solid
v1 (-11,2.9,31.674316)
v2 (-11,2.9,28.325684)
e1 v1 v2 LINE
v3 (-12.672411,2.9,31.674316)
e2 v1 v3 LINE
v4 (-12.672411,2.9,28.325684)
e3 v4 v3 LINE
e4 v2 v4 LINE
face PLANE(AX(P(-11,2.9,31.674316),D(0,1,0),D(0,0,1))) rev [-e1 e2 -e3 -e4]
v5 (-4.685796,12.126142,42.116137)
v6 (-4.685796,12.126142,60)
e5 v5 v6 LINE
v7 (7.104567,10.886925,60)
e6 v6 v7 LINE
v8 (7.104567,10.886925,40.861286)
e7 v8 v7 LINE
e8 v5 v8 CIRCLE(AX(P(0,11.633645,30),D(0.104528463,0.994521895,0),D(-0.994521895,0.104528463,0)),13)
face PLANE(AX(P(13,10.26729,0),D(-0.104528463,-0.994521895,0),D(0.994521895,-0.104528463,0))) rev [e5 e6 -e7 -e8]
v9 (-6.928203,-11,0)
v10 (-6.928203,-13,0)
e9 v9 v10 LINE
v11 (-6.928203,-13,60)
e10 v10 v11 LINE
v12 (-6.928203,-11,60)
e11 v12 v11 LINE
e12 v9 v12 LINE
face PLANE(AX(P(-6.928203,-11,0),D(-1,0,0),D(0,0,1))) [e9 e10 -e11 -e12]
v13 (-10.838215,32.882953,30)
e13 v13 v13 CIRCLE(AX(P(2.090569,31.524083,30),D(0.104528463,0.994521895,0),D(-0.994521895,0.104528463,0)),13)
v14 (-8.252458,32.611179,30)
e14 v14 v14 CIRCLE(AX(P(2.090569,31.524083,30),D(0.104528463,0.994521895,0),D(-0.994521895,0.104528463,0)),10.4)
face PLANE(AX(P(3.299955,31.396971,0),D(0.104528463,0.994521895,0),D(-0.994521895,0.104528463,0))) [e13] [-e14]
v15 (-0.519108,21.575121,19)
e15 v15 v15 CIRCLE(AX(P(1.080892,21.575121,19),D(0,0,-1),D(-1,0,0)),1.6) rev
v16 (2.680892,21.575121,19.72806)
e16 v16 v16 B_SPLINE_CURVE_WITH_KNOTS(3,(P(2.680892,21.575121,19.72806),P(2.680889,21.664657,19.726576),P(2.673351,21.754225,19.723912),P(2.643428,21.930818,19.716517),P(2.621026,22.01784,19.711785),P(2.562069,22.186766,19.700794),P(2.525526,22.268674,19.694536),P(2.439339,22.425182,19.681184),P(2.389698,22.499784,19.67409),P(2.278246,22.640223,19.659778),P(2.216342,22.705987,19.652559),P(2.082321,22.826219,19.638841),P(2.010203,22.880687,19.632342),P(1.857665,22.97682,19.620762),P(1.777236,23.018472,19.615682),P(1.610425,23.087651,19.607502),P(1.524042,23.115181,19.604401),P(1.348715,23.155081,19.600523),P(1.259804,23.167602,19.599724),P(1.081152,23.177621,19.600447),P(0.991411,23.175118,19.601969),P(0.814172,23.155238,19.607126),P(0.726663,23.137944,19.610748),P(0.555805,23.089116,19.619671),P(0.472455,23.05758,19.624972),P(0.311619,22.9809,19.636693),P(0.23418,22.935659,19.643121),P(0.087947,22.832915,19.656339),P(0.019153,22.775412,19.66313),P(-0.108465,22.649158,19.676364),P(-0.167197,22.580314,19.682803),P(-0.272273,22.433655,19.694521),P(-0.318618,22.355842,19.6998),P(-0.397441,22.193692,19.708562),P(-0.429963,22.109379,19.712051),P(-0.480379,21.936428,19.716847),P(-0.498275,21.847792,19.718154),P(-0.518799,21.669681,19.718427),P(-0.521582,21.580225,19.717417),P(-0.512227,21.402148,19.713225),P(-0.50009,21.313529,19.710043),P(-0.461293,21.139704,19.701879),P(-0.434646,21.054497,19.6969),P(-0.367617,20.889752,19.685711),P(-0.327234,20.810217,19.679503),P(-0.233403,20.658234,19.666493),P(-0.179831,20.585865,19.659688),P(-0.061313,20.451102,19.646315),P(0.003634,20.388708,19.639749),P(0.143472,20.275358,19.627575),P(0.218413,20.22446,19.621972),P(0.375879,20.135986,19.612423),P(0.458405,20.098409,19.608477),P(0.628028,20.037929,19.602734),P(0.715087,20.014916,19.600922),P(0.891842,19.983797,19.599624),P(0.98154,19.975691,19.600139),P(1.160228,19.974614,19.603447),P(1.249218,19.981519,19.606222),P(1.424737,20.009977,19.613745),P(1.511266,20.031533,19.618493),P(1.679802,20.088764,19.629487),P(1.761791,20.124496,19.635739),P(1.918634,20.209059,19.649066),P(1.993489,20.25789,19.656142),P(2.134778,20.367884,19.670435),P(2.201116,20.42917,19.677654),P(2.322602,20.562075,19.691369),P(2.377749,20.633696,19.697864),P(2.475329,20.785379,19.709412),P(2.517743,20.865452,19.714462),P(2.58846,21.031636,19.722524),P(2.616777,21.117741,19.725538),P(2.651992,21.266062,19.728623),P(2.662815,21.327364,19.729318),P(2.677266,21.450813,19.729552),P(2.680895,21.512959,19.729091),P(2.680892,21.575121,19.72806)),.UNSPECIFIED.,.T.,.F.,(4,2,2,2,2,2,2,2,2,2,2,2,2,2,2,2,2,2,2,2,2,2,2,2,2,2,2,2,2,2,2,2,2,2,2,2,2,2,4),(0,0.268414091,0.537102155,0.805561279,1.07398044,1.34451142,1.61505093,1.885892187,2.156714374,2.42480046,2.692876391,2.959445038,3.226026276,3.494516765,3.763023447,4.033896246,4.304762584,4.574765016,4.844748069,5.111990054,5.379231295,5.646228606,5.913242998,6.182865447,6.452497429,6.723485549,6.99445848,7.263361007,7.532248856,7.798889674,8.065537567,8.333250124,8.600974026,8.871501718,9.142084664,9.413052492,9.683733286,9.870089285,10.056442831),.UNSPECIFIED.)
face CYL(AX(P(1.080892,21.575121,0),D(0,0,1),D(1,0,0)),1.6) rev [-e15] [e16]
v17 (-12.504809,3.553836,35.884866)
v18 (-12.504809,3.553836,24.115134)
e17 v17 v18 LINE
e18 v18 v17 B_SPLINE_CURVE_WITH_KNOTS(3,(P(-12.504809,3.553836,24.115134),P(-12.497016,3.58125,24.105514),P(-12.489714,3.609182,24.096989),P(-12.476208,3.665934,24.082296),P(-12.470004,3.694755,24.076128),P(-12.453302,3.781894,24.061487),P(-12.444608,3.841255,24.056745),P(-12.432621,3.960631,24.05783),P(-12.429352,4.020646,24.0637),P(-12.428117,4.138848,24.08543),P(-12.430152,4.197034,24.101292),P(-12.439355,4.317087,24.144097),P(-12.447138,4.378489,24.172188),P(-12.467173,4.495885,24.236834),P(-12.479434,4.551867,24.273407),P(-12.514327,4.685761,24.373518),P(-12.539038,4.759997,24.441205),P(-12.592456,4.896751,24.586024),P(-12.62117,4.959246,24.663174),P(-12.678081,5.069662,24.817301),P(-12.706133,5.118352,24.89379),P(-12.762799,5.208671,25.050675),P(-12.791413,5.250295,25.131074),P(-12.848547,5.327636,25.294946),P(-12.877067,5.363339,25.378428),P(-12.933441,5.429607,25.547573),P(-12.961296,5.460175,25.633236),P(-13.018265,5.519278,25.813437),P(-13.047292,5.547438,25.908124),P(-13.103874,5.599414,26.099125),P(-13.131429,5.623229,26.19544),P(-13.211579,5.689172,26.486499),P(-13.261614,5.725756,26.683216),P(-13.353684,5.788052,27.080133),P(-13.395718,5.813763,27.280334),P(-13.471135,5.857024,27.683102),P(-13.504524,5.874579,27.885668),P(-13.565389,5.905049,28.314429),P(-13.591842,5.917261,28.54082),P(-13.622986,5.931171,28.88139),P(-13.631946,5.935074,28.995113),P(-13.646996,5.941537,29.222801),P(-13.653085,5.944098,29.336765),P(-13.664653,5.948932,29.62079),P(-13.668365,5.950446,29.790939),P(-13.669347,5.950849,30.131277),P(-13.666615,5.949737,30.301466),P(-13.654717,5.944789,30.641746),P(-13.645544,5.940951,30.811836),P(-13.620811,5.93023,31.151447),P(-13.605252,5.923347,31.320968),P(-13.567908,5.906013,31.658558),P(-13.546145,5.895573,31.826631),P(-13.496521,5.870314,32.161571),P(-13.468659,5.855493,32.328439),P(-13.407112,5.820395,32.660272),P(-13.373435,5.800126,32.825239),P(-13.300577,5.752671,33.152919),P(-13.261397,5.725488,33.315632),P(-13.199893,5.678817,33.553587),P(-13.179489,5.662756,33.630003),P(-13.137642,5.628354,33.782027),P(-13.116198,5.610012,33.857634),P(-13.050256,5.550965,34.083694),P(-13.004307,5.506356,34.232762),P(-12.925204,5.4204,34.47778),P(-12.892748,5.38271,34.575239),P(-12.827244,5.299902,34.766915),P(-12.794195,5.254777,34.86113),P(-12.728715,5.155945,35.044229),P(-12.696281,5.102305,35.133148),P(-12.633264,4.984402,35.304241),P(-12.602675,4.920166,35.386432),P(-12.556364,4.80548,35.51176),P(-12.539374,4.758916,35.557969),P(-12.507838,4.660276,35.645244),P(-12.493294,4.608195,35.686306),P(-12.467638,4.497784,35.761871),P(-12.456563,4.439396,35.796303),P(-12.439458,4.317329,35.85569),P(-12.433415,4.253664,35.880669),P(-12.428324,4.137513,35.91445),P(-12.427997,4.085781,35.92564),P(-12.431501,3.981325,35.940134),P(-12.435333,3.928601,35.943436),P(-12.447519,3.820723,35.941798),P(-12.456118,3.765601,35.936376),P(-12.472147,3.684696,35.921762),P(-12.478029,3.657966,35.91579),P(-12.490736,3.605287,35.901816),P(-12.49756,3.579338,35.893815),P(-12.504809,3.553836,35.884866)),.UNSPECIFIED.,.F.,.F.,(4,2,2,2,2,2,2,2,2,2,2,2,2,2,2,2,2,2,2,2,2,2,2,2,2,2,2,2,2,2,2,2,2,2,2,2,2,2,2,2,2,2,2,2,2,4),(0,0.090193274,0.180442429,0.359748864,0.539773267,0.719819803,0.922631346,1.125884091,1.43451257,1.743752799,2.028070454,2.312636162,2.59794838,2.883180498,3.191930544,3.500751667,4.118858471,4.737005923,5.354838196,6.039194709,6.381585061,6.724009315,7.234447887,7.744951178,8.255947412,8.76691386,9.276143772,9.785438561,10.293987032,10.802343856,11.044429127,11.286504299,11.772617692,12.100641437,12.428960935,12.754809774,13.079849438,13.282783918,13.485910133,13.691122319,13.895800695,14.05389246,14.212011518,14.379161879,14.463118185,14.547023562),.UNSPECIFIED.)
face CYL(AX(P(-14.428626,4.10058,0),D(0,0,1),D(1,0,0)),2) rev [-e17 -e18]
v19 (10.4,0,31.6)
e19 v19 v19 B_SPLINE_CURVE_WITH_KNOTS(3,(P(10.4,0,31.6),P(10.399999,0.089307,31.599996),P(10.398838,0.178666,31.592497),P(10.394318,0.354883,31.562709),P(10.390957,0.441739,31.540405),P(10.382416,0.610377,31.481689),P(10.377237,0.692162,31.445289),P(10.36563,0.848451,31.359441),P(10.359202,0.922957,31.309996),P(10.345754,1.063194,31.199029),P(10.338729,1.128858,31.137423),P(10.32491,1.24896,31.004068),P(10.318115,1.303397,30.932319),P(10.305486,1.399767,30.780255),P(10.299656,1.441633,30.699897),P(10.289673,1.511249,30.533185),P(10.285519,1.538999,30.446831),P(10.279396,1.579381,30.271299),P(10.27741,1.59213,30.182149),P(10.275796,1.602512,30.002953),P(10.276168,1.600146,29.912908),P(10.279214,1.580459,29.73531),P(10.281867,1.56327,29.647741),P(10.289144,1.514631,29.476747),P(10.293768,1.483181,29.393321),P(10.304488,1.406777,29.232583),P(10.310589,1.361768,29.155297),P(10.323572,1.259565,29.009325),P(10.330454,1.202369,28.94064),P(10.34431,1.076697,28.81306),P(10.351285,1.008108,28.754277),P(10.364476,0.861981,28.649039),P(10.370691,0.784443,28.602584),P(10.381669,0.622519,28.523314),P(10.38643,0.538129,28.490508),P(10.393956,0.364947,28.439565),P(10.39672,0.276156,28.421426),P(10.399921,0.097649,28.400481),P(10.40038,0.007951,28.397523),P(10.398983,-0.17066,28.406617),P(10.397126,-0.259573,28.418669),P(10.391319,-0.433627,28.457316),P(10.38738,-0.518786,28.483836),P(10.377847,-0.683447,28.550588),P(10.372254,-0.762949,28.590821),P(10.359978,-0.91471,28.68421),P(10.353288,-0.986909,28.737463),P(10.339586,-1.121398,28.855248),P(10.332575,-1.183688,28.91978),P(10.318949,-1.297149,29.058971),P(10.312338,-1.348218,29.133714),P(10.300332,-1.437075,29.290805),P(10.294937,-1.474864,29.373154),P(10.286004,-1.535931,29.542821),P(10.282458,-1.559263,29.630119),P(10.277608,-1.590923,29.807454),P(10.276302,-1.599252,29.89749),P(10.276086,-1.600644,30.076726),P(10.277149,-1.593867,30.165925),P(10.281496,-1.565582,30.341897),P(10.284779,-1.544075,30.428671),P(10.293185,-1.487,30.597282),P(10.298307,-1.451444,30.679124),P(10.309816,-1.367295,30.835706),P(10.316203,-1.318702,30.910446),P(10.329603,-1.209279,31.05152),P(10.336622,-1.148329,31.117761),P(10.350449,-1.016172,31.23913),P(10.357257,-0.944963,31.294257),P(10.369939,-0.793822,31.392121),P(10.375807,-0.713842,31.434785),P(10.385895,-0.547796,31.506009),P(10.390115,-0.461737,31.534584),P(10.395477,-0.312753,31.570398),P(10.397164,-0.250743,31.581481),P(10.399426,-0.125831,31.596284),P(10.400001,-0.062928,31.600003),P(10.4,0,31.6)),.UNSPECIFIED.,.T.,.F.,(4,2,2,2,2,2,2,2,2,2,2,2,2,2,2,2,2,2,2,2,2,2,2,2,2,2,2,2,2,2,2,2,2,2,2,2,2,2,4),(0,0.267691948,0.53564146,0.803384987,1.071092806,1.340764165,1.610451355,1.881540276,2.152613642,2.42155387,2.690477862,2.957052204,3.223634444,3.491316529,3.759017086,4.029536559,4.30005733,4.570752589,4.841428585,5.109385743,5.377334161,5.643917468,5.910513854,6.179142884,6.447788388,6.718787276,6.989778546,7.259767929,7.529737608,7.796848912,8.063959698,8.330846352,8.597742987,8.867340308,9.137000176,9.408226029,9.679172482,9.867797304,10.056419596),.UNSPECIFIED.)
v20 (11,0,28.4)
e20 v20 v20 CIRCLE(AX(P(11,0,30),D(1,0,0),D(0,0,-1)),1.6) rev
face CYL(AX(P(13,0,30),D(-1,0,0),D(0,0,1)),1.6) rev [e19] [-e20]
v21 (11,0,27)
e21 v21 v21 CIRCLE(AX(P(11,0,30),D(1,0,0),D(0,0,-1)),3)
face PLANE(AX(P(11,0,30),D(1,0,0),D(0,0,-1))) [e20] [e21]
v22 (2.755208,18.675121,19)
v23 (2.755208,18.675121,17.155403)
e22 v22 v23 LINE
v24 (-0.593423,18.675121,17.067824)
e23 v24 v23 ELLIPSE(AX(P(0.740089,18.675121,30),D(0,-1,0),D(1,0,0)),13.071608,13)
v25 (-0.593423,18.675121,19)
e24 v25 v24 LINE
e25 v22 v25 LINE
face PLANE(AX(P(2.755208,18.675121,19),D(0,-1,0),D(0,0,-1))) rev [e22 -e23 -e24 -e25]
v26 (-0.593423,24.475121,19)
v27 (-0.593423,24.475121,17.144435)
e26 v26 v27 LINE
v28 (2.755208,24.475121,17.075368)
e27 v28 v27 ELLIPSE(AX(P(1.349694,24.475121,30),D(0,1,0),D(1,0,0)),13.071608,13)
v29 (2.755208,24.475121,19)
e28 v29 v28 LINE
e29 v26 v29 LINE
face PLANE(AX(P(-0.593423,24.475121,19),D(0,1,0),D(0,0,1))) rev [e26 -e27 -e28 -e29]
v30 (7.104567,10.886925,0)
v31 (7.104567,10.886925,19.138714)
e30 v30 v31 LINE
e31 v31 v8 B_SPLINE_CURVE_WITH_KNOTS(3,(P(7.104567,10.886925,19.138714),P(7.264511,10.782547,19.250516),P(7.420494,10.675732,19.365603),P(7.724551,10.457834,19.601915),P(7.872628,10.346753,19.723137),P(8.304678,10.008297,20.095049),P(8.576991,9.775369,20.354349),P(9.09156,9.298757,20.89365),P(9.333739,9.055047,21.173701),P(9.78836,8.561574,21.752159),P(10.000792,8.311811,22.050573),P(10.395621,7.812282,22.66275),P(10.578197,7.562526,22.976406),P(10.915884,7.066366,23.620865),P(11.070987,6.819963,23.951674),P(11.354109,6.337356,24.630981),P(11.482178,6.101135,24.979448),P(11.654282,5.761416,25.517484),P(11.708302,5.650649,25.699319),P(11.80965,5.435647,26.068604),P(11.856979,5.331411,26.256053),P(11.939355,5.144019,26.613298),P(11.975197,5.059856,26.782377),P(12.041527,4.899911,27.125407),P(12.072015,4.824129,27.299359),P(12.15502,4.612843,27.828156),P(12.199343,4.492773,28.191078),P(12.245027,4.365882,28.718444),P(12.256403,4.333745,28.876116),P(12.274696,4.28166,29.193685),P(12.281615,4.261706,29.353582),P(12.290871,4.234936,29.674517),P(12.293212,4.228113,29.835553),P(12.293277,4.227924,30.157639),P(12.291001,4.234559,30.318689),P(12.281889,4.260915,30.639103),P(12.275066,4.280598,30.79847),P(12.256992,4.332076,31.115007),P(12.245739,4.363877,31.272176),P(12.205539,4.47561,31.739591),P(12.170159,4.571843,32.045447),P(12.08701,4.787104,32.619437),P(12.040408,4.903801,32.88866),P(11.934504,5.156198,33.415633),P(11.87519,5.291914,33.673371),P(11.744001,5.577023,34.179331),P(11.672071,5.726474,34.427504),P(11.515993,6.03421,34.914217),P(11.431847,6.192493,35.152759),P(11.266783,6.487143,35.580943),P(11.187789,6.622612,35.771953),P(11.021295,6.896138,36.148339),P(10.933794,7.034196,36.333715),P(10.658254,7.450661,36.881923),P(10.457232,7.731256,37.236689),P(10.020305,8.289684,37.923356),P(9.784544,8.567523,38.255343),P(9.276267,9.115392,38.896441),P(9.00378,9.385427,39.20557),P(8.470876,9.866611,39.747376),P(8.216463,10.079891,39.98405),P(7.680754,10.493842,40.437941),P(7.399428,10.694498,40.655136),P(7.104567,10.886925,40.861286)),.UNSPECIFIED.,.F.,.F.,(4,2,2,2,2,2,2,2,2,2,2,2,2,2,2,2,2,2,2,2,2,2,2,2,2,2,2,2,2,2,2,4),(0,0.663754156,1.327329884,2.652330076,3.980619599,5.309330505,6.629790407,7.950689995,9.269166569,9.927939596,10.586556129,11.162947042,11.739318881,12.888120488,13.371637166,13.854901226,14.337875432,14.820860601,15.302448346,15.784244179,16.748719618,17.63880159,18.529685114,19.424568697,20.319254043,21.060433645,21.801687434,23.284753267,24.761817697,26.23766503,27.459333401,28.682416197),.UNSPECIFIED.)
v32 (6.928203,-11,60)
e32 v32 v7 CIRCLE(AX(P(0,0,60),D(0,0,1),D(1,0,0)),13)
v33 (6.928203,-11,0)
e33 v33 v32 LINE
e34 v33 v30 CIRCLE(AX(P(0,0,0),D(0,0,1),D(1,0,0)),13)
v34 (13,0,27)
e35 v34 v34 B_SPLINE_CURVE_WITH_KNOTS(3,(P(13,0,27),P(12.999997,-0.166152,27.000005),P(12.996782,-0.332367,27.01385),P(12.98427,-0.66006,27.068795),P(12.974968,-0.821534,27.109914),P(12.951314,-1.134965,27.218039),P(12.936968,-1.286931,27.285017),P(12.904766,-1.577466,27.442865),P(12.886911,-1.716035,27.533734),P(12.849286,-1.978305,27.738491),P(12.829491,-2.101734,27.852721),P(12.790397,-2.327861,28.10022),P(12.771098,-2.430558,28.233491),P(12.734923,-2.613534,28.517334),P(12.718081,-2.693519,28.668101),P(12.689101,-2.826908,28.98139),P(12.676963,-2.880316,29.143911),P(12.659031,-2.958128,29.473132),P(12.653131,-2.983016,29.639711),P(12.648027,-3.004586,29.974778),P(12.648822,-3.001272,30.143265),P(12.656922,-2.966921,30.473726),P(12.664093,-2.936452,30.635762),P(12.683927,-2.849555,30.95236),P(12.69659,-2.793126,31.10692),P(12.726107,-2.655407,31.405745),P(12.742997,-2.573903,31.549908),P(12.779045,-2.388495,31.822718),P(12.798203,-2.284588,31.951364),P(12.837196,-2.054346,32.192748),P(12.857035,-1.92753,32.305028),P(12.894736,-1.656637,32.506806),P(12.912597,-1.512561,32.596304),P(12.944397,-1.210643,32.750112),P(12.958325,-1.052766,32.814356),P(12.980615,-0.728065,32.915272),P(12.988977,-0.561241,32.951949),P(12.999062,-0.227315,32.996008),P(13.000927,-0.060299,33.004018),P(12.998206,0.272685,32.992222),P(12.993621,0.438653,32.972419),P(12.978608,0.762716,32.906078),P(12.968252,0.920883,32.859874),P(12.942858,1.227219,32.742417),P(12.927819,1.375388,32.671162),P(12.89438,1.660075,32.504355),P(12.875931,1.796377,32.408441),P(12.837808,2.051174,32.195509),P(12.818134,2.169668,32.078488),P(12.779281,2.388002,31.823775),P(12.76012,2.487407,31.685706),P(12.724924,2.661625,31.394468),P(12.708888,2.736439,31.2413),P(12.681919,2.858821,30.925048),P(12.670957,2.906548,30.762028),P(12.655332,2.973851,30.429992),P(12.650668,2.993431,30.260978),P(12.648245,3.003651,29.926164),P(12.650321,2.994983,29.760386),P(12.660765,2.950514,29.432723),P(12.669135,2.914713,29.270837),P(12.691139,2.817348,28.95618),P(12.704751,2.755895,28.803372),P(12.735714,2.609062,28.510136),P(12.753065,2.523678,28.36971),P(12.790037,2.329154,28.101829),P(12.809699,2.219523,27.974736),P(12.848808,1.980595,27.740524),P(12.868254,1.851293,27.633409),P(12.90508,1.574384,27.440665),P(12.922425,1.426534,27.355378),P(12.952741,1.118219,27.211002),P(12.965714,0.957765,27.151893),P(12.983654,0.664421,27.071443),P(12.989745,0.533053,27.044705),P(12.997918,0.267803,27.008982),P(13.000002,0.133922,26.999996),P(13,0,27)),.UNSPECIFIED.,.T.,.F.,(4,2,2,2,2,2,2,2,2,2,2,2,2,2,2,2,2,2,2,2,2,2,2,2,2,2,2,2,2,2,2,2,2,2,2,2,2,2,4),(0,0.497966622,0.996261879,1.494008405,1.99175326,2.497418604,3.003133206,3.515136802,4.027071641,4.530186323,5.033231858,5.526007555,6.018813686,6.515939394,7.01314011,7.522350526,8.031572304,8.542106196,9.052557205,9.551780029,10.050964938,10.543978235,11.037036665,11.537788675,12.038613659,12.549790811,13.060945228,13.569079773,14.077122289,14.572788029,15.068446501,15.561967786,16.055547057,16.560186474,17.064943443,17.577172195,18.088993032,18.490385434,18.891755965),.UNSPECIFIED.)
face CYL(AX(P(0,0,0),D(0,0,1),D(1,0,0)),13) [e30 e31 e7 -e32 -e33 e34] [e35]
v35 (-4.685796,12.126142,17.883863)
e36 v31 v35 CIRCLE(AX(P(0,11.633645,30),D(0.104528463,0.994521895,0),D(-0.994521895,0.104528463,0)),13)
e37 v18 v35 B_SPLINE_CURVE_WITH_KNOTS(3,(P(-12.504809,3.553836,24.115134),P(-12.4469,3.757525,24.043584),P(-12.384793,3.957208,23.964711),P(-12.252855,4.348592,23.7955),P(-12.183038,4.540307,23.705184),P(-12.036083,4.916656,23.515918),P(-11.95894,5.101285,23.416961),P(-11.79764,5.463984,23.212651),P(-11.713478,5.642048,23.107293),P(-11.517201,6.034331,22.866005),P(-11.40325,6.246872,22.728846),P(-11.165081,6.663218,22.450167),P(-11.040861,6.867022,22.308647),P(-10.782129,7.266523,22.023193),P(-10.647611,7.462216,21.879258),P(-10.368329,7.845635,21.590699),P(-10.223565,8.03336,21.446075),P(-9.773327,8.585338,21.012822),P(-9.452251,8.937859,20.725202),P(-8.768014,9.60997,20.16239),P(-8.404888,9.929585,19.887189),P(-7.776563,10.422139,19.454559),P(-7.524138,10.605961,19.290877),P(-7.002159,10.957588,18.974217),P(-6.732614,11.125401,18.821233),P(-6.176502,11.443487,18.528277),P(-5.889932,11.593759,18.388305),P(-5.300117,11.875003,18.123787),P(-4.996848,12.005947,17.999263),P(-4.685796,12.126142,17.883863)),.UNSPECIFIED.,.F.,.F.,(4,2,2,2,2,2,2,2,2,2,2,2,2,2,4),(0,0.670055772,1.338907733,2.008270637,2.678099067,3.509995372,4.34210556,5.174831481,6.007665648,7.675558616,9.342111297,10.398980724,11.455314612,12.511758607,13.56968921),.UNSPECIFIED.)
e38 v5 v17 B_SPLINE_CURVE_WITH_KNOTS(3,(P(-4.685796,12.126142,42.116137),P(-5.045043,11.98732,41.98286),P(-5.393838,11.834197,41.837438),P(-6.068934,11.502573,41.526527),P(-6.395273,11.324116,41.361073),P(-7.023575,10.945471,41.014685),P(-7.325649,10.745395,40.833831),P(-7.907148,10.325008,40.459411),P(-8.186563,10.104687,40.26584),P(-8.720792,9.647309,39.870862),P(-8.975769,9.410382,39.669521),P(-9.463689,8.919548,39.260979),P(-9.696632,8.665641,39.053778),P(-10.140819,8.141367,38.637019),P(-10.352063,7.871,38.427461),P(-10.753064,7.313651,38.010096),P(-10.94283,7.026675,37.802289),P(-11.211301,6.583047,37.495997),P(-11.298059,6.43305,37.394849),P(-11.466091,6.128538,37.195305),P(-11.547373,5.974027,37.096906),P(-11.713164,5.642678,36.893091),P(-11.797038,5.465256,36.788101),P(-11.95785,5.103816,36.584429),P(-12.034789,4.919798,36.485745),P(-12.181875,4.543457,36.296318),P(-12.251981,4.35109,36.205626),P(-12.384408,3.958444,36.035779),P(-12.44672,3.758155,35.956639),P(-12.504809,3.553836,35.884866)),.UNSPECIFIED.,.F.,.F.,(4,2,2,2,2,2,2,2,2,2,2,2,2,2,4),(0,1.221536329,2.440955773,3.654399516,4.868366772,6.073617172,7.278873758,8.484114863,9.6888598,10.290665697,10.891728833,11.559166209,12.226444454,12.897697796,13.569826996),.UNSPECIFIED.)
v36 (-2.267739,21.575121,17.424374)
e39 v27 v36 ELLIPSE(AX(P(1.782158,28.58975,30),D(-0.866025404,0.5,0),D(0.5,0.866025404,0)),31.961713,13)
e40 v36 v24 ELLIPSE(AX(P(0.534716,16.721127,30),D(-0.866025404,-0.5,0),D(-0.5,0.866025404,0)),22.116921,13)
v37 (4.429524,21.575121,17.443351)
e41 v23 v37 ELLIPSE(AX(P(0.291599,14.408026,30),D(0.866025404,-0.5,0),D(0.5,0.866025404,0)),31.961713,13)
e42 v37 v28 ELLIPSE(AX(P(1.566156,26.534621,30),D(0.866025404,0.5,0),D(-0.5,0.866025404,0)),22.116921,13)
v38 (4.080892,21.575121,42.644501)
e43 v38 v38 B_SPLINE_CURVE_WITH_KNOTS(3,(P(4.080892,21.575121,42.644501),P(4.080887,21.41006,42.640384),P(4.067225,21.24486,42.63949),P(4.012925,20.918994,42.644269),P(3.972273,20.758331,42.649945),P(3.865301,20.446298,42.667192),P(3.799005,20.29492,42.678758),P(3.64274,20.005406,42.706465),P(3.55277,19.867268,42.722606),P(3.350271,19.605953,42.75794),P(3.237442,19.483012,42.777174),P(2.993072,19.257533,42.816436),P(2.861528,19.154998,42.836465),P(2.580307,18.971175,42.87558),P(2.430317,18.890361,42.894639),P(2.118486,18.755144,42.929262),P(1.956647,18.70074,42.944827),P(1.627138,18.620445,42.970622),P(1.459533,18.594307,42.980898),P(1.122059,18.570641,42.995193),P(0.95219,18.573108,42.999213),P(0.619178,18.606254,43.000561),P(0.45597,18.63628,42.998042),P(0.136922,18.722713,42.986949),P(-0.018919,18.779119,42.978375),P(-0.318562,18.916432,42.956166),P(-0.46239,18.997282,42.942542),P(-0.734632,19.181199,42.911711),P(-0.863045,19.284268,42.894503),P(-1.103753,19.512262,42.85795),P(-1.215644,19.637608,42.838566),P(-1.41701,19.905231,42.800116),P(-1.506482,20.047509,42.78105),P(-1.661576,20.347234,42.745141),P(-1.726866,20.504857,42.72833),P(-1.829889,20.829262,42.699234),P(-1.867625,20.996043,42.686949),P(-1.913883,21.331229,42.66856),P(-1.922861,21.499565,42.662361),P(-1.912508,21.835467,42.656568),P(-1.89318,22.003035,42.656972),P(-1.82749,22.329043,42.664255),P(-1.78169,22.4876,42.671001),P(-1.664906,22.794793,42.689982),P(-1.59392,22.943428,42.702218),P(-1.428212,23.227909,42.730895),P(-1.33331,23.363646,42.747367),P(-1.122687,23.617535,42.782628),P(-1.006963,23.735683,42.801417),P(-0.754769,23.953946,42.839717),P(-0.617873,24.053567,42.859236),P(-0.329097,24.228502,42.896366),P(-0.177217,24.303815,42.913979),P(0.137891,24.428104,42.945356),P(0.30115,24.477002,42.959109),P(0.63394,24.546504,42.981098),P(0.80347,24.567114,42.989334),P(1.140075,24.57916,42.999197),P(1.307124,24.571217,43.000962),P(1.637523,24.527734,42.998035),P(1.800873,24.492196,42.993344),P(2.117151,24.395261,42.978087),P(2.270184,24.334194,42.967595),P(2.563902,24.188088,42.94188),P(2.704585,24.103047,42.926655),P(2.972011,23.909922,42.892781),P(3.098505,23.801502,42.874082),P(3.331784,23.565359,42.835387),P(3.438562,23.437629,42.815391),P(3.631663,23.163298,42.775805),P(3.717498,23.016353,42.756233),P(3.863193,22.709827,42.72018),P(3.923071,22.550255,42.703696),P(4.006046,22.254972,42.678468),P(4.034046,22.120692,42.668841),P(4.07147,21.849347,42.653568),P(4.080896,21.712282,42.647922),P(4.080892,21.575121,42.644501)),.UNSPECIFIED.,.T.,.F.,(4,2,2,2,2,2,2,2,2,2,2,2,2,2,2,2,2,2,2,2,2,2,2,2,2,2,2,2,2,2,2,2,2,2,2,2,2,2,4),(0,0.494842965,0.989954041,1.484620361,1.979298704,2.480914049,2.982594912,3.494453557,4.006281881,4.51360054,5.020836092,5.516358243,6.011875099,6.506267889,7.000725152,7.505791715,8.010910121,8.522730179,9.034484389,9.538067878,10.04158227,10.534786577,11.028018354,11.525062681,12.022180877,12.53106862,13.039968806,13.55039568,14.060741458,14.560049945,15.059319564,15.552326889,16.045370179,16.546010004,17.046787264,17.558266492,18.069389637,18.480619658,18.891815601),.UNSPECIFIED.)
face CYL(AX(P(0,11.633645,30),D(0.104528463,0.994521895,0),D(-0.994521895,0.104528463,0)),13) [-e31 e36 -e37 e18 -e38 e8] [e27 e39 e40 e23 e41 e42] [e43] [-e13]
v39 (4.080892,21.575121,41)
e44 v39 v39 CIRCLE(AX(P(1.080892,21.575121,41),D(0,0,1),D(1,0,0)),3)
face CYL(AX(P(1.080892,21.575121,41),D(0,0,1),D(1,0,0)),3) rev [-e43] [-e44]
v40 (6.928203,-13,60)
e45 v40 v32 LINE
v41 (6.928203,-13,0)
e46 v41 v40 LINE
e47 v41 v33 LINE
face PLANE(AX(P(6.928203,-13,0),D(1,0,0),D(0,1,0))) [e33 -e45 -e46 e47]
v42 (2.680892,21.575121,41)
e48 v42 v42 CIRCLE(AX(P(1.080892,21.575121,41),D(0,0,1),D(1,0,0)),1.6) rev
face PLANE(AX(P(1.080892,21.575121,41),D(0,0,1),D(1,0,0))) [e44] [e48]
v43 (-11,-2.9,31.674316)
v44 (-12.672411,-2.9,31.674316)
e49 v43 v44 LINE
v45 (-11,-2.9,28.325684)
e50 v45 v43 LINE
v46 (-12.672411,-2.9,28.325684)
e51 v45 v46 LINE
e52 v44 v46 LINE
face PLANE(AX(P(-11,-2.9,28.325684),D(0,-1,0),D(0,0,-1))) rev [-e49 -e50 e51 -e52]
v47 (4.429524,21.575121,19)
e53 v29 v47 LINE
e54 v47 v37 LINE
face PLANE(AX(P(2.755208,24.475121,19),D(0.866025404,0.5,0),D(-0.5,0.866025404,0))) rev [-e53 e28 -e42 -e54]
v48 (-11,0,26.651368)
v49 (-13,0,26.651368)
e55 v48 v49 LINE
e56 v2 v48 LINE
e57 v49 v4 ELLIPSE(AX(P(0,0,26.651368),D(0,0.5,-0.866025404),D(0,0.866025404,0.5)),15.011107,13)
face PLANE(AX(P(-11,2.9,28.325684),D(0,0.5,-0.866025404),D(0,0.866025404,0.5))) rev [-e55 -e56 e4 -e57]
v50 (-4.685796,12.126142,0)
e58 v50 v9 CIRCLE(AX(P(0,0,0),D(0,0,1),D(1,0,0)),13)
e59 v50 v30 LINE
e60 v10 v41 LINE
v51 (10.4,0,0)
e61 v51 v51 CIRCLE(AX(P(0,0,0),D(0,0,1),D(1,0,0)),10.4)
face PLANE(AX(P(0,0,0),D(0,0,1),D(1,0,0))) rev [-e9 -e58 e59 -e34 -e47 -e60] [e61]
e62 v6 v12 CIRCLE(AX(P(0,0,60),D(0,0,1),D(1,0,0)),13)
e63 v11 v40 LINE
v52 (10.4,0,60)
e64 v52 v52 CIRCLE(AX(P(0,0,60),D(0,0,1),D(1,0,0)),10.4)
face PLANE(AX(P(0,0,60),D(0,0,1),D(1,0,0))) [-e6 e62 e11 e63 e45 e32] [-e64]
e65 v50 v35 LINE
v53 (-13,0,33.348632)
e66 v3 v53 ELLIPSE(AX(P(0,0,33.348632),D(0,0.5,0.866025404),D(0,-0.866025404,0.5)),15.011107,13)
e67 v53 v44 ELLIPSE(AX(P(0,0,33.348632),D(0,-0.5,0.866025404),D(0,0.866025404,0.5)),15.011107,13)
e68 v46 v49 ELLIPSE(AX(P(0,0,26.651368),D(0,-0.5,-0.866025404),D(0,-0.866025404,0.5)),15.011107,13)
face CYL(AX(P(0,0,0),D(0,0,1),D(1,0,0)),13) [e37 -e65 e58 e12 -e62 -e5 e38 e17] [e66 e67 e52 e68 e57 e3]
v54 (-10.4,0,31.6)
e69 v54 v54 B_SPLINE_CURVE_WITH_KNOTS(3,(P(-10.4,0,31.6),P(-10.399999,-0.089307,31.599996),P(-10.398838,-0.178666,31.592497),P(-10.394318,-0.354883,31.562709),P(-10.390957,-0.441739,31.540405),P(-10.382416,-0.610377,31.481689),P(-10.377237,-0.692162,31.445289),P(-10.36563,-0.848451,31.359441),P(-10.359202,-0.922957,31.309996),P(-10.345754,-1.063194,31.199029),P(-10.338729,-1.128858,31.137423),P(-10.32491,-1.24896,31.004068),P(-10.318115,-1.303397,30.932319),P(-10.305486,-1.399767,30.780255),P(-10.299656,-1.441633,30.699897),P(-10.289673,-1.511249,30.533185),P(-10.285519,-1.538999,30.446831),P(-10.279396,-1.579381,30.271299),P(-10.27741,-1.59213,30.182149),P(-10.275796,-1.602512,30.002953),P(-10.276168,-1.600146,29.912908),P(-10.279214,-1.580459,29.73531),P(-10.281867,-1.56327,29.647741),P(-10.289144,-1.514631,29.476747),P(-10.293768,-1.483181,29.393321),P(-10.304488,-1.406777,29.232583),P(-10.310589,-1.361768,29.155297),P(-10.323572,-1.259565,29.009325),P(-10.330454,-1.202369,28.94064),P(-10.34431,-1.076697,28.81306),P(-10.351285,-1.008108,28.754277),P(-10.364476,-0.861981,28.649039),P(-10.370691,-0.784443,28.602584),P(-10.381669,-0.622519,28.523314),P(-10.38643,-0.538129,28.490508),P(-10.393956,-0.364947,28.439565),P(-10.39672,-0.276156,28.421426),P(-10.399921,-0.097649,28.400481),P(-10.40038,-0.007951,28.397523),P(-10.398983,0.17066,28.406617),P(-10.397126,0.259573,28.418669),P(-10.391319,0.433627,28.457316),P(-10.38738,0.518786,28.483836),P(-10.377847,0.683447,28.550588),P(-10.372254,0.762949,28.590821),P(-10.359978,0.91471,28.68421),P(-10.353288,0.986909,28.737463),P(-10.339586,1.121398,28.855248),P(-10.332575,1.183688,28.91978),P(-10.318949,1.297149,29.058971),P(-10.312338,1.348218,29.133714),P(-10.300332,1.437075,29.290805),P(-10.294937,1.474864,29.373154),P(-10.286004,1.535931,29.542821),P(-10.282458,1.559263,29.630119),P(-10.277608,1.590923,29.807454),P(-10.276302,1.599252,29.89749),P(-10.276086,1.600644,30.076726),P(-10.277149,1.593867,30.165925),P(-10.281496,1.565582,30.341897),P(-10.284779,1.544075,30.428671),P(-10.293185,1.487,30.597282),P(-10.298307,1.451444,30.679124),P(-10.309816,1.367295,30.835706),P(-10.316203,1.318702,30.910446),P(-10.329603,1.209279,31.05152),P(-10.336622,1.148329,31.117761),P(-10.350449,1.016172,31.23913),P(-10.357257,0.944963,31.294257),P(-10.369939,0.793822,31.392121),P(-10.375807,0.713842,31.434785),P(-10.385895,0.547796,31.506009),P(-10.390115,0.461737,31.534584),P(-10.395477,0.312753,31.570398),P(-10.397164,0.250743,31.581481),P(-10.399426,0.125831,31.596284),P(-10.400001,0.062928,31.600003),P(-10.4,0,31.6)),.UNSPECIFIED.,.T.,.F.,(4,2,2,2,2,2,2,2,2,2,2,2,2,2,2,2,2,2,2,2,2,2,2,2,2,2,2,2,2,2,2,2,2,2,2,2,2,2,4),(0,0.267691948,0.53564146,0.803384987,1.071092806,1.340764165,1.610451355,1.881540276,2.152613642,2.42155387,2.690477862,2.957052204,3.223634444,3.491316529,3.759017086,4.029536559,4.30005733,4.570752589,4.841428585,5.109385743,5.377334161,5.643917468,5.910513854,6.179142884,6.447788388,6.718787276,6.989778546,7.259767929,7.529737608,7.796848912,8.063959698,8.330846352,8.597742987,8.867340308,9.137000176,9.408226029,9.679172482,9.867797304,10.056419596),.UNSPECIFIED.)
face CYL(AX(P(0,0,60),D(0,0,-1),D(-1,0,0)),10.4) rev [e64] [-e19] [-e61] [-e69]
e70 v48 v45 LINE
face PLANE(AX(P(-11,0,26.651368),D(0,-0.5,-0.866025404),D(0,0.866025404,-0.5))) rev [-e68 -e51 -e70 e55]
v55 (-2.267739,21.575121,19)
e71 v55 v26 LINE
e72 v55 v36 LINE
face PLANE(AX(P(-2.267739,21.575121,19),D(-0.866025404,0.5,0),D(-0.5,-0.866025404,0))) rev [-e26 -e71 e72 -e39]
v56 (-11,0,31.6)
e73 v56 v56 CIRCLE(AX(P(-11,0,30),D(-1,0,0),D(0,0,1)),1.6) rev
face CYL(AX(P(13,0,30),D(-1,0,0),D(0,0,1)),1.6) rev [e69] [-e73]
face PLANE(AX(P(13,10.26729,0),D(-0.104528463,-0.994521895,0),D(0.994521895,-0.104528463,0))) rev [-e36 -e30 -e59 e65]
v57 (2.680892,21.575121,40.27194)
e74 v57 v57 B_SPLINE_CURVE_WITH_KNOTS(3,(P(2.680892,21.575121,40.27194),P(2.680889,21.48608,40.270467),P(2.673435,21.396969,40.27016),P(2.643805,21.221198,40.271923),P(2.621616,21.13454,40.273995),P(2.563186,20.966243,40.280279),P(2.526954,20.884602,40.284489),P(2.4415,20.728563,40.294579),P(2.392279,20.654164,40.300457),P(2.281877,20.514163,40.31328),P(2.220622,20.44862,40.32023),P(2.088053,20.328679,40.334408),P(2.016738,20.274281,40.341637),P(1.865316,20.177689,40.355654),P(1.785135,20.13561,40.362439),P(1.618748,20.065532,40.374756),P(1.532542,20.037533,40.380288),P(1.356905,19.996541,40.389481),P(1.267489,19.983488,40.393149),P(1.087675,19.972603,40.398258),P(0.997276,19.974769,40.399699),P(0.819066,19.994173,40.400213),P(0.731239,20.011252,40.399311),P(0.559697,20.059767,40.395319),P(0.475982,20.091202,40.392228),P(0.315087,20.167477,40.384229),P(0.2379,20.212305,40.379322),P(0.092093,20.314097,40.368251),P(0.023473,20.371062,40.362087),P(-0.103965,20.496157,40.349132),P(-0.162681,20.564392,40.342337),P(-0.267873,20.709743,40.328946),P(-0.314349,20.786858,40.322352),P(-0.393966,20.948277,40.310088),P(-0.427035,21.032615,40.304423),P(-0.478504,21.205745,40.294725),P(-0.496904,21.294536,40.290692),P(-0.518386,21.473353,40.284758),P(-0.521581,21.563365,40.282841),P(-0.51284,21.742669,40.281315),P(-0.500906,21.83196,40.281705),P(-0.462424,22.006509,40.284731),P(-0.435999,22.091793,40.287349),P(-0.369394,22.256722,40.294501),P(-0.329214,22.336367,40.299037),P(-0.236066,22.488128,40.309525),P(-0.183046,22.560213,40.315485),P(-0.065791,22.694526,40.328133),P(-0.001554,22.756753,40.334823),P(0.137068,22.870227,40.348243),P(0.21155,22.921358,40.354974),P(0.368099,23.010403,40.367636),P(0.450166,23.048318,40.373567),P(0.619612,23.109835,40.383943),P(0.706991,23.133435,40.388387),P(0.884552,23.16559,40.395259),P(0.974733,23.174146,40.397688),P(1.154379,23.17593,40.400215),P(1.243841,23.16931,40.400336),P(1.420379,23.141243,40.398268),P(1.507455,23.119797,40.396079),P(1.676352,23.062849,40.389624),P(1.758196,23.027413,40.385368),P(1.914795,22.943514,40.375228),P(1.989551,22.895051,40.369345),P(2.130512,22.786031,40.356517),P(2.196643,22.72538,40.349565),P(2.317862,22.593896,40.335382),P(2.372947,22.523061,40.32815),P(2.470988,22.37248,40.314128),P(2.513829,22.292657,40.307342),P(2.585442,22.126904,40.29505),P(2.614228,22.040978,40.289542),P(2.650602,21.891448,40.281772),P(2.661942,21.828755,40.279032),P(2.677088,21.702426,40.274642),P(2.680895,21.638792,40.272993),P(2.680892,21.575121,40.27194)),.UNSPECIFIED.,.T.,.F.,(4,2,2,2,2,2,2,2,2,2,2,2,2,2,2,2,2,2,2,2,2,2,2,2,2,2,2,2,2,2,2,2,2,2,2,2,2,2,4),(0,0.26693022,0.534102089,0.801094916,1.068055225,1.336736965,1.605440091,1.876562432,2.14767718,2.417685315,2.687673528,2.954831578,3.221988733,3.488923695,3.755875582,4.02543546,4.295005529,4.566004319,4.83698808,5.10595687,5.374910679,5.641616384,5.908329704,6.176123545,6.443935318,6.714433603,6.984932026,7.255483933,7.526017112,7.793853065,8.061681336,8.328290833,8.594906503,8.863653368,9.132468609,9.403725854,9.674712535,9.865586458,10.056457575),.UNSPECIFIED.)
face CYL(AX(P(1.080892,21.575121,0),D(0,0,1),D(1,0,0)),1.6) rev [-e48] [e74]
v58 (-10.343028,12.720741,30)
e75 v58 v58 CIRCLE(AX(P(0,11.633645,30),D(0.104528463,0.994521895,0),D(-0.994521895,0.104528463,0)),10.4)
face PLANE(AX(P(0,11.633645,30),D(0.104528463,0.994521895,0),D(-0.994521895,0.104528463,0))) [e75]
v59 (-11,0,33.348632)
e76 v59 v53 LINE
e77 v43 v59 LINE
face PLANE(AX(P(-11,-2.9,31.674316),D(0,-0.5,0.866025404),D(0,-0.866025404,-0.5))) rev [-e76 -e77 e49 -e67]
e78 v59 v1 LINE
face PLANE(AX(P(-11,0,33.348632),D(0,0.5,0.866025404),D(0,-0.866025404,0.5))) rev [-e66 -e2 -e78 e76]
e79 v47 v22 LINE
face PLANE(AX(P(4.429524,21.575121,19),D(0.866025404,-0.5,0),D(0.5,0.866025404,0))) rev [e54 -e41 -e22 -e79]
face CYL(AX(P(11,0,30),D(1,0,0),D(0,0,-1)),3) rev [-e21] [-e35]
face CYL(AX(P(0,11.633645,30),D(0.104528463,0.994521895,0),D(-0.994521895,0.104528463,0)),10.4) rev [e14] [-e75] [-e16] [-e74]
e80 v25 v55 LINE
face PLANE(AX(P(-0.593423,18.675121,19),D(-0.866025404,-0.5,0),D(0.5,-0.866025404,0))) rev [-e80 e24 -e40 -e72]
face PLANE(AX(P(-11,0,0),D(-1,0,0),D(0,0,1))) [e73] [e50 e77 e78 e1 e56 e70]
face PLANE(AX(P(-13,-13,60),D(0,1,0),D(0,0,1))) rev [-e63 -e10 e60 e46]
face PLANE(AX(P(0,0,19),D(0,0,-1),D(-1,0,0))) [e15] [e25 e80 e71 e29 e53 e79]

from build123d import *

# Parameters (mm, degrees)
SKETCH1_W            = 26
SKETCH1_H            = 26
SKETCH1_R            = 10.4
BOSS_EXTRUDE2_DEPTH  = 60
SKETCH2_R            = 1.6
CUT_EXTRUDE1_DEPTH   = 67.670833203
CUT_EXTRUDE2_DEPTH   = 2
SKETCH4_R            = 3
CUT_EXTRUDE3_DEPTH   = 2
CUT_EXTRUDE5_DEPTH   = 63.753486055
SKETCH7_W            = 26
SKETCH7_H            = 26
BOSS_EXTRUDE3_DEPTH  = 20
SKETCH8_R            = 1.6
CUT_EXTRUDE6_DEPTH   = 57.177126928
SKETCH9_R            = 3
CUT_EXTRUDE7_DEPTH   = 2
CUT_EXTRUDE8_DEPTH   = 2
SKETCH11_OUTSIDE_W   = 50.774
SKETCH11_OUTSIDE_H   = 78.112
SKETCH11_OUTSIDE_R   = 13
SKETCH11_OUTSIDE_R_2 = 10.4
CUT_EXTRUDE9_DEPTH   = 20
SKETCH5_OUTSIDE_W    = 46.131
SKETCH5_OUTSIDE_H    = 63.995
CUT_EXTRUDE4_DEPTH   = 71.049051406
SKETCH13_R           = 13
BOSS_EXTRUDE4_DEPTH  = 7
FILLET1_R            = 2
SKETCH14_R           = 10.4
CUT_EXTRUDE10_DEPTH  = 71.049051406


with BuildPart() as part:
    # Sketch1 → Boss-Extrude2 (new body)
    with BuildSketch(Plane.XY):
        Rectangle(SKETCH1_W, SKETCH1_H)
        Circle(SKETCH1_R, mode=Mode.SUBTRACT)
    extrude(amount=BOSS_EXTRUDE2_DEPTH)

    # Sketch2 → Cut-Extrude1 (cut, through all)
    with BuildSketch(Plane.ZY.offset(13)):
        with Locations((30, 0)):
            Circle(SKETCH2_R)
    extrude(amount=-CUT_EXTRUDE1_DEPTH, mode=Mode.SUBTRACT)

    # Sketch3 → Cut-Extrude2 (cut)
    with BuildSketch(Plane.ZY.offset(13)):
        Polygon((33.348631561, 0), (31.674315781, 2.9), (28.325684219, 2.9), (26.651368439, 0), (28.325684219, -2.9), (31.674315781, -2.9), align=None)
    extrude(amount=-CUT_EXTRUDE2_DEPTH, mode=Mode.SUBTRACT)

    # Sketch4 → Cut-Extrude3 (cut)
    with BuildSketch(Plane(origin=(13, 0, 0), x_dir=(0, 0, -1), z_dir=(1, 0, 0))):
        with Locations((-30, 0)):
            Circle(SKETCH4_R)
    extrude(amount=-CUT_EXTRUDE3_DEPTH, mode=Mode.SUBTRACT)

    # Sketch6 → Cut-Extrude5 (cut, through all)
    with BuildSketch(Plane.XY.offset(60)):
        Polygon((-13, 13), (13, 13), (13, 10.267289883), align=None)
    extrude(amount=-CUT_EXTRUDE5_DEPTH, mode=Mode.SUBTRACT)

    # Sketch7 → Boss-Extrude3 (add)
    with BuildSketch(Plane(origin=(1.209385395, 11.506533414, 0), x_dir=(0.9945218953682742, -0.1045284632676464, 0), z_dir=(0.1045284632676464, 0.9945218953682742, 0))):
        with Locations((-1.216047028, -30)):
            Rectangle(SKETCH7_W, SKETCH7_H)
    extrude(amount=BOSS_EXTRUDE3_DEPTH)

    # Sketch8 → Cut-Extrude6 (cut, through all)
    with BuildSketch(Plane.XY.offset(43)):
        with Locations((1.080892313, 21.575121377)):
            Circle(SKETCH8_R)
    extrude(amount=-CUT_EXTRUDE6_DEPTH, mode=Mode.SUBTRACT)

    # Sketch9 → Cut-Extrude7 (cut)
    with BuildSketch(Plane.XY.offset(43)):
        with Locations((1.080892313, 21.575121377)):
            Circle(SKETCH9_R)
    extrude(amount=-CUT_EXTRUDE7_DEPTH, mode=Mode.SUBTRACT)

    # Sketch10 → Cut-Extrude8 (cut)
    with BuildSketch(Plane(origin=(0, 0, 17), x_dir=(-1, 0, 0), z_dir=(0, 0, -1))):
        Polygon((2.267739249, 21.575121377), (0.593423468, 24.475121377), (-2.755208093, 24.475121377), (-4.429523874, 21.575121377), (-2.755208093, 18.675121377), (0.593423468, 18.675121377), align=None)
    extrude(amount=-CUT_EXTRUDE8_DEPTH, mode=Mode.SUBTRACT)

    # Sketch11 outside → Cut-Extrude9 (cut)
    # profile 1 of 2: a face of its own
    with BuildSketch(Plane(origin=(3.29995466, 31.396971322, 0), x_dir=(0.9945218953682742, -0.10452846326764643, 0), z_dir=(0.10452846326764643, 0.9945218953682742, 0))):
        with Locations((-0.035, -30)):
            Rectangle(SKETCH11_OUTSIDE_W, SKETCH11_OUTSIDE_H)
        with Locations(Location((-1.216047028, -30, 0), (0, 0, 180))):
            Circle(SKETCH11_OUTSIDE_R, mode=Mode.SUBTRACT)
    # profile 2 of 2: a face of its own
    with BuildSketch(Plane(origin=(3.29995466, 31.396971322, 0), x_dir=(0.9945218953682742, -0.10452846326764643, 0), z_dir=(0.10452846326764643, 0.9945218953682742, 0))):
        with Locations(Location((-1.216047028, -30, 0), (0, 0, 180))):
            Circle(SKETCH11_OUTSIDE_R_2)
    extrude(amount=-CUT_EXTRUDE9_DEPTH, mode=Mode.SUBTRACT)

    # Sketch5 outside → Cut-Extrude4 (cut, through all)
    with BuildSketch(Plane.XY.offset(60)):
        with Locations((1.0095, 9.9415)):
            Rectangle(SKETCH5_OUTSIDE_W, SKETCH5_OUTSIDE_H)
        with BuildLine():
            Line((-6.92820323, -11), (-6.92820323, -13))
            Line((-6.92820323, -13), (6.92820323, -13))
            Line((6.92820323, -13), (6.92820323, -11))
            ThreePointArc((6.92820323, -11), (12.999577974, -0.104749706), (7.104566567, 10.886924906))
            Line((7.104566567, 10.886924906), (13, 10.267289883))
            Line((13, 10.267289883), (15.291712761, 31.831368542))
            Line((15.291712761, 31.831368542), (-10.708287239, 34.594506849))
            Line((-10.708287239, 34.594506849), (-13, 13))
            Line((-13, 13), (-4.685795776, 12.126141923))
            ThreePointArc((-4.685795776, 12.126141923), (-12.939314251, 1.254650033), (-6.92820323, -11))
        make_face(mode=Mode.SUBTRACT)
    extrude(amount=-CUT_EXTRUDE4_DEPTH, mode=Mode.SUBTRACT)

    # Sketch13 → Boss-Extrude4 (add)
    with BuildSketch(Plane(origin=(1.209385395, 11.506533414, 0), x_dir=(0.9945218953682741, -0.10452846326764687, 0), z_dir=(-0.10452846326764687, -0.9945218953682741, 0))):
        with Locations(Location((-1.216047028, 30, 0), (0, 0, 180))):
            Circle(SKETCH13_R)
    extrude(amount=BOSS_EXTRUDE4_DEPTH)

    # Fillet1
    # the kernel refuses this fillet: 2 mm, written as the material it adds along each edge
    with BuildSketch(Plane(origin=(-11.625930527, 5.817021522, 16.479857089), x_dir=(-0.36199929686843824, -0.9321783676243277, 0), z_dir=(0, 0, 1))) as fillet1_piece_1_section:
        with BuildLine():
            CenterArc((2.614603278, -1.991261329), FILLET1_R, 95.358010672, 99.865019887)
            Line((0.684781224, -2.516415439), (0, 0))
            ThreePointArc((0, 0), (1.213922951, -0.056801359), (2.427845901, 0))
        make_face()
    fillet1_piece_1 = extrude(amount=27.040285822, mode=Mode.PRIVATE)
    fillet1_piece_1 = fillet1_piece_1 & Plane(origin=(-0.793541371, 4.083603133, 30), x_dir=(-0.9945218953682741, 0.10452846326764687, 0), z_dir=(0.10452846326764687, 0.9945218953682741, 0)) * Cylinder(13, 65, mode=Mode.PRIVATE)
    add(fillet1_piece_1)

    # Sketch14 → Cut-Extrude10 (cut, through all)
    with BuildSketch(Plane.XY.offset(60)):
        Circle(SKETCH14_R)
    extrude(amount=-CUT_EXTRUDE10_DEPTH, mode=Mode.SUBTRACT)


solid = part.part
